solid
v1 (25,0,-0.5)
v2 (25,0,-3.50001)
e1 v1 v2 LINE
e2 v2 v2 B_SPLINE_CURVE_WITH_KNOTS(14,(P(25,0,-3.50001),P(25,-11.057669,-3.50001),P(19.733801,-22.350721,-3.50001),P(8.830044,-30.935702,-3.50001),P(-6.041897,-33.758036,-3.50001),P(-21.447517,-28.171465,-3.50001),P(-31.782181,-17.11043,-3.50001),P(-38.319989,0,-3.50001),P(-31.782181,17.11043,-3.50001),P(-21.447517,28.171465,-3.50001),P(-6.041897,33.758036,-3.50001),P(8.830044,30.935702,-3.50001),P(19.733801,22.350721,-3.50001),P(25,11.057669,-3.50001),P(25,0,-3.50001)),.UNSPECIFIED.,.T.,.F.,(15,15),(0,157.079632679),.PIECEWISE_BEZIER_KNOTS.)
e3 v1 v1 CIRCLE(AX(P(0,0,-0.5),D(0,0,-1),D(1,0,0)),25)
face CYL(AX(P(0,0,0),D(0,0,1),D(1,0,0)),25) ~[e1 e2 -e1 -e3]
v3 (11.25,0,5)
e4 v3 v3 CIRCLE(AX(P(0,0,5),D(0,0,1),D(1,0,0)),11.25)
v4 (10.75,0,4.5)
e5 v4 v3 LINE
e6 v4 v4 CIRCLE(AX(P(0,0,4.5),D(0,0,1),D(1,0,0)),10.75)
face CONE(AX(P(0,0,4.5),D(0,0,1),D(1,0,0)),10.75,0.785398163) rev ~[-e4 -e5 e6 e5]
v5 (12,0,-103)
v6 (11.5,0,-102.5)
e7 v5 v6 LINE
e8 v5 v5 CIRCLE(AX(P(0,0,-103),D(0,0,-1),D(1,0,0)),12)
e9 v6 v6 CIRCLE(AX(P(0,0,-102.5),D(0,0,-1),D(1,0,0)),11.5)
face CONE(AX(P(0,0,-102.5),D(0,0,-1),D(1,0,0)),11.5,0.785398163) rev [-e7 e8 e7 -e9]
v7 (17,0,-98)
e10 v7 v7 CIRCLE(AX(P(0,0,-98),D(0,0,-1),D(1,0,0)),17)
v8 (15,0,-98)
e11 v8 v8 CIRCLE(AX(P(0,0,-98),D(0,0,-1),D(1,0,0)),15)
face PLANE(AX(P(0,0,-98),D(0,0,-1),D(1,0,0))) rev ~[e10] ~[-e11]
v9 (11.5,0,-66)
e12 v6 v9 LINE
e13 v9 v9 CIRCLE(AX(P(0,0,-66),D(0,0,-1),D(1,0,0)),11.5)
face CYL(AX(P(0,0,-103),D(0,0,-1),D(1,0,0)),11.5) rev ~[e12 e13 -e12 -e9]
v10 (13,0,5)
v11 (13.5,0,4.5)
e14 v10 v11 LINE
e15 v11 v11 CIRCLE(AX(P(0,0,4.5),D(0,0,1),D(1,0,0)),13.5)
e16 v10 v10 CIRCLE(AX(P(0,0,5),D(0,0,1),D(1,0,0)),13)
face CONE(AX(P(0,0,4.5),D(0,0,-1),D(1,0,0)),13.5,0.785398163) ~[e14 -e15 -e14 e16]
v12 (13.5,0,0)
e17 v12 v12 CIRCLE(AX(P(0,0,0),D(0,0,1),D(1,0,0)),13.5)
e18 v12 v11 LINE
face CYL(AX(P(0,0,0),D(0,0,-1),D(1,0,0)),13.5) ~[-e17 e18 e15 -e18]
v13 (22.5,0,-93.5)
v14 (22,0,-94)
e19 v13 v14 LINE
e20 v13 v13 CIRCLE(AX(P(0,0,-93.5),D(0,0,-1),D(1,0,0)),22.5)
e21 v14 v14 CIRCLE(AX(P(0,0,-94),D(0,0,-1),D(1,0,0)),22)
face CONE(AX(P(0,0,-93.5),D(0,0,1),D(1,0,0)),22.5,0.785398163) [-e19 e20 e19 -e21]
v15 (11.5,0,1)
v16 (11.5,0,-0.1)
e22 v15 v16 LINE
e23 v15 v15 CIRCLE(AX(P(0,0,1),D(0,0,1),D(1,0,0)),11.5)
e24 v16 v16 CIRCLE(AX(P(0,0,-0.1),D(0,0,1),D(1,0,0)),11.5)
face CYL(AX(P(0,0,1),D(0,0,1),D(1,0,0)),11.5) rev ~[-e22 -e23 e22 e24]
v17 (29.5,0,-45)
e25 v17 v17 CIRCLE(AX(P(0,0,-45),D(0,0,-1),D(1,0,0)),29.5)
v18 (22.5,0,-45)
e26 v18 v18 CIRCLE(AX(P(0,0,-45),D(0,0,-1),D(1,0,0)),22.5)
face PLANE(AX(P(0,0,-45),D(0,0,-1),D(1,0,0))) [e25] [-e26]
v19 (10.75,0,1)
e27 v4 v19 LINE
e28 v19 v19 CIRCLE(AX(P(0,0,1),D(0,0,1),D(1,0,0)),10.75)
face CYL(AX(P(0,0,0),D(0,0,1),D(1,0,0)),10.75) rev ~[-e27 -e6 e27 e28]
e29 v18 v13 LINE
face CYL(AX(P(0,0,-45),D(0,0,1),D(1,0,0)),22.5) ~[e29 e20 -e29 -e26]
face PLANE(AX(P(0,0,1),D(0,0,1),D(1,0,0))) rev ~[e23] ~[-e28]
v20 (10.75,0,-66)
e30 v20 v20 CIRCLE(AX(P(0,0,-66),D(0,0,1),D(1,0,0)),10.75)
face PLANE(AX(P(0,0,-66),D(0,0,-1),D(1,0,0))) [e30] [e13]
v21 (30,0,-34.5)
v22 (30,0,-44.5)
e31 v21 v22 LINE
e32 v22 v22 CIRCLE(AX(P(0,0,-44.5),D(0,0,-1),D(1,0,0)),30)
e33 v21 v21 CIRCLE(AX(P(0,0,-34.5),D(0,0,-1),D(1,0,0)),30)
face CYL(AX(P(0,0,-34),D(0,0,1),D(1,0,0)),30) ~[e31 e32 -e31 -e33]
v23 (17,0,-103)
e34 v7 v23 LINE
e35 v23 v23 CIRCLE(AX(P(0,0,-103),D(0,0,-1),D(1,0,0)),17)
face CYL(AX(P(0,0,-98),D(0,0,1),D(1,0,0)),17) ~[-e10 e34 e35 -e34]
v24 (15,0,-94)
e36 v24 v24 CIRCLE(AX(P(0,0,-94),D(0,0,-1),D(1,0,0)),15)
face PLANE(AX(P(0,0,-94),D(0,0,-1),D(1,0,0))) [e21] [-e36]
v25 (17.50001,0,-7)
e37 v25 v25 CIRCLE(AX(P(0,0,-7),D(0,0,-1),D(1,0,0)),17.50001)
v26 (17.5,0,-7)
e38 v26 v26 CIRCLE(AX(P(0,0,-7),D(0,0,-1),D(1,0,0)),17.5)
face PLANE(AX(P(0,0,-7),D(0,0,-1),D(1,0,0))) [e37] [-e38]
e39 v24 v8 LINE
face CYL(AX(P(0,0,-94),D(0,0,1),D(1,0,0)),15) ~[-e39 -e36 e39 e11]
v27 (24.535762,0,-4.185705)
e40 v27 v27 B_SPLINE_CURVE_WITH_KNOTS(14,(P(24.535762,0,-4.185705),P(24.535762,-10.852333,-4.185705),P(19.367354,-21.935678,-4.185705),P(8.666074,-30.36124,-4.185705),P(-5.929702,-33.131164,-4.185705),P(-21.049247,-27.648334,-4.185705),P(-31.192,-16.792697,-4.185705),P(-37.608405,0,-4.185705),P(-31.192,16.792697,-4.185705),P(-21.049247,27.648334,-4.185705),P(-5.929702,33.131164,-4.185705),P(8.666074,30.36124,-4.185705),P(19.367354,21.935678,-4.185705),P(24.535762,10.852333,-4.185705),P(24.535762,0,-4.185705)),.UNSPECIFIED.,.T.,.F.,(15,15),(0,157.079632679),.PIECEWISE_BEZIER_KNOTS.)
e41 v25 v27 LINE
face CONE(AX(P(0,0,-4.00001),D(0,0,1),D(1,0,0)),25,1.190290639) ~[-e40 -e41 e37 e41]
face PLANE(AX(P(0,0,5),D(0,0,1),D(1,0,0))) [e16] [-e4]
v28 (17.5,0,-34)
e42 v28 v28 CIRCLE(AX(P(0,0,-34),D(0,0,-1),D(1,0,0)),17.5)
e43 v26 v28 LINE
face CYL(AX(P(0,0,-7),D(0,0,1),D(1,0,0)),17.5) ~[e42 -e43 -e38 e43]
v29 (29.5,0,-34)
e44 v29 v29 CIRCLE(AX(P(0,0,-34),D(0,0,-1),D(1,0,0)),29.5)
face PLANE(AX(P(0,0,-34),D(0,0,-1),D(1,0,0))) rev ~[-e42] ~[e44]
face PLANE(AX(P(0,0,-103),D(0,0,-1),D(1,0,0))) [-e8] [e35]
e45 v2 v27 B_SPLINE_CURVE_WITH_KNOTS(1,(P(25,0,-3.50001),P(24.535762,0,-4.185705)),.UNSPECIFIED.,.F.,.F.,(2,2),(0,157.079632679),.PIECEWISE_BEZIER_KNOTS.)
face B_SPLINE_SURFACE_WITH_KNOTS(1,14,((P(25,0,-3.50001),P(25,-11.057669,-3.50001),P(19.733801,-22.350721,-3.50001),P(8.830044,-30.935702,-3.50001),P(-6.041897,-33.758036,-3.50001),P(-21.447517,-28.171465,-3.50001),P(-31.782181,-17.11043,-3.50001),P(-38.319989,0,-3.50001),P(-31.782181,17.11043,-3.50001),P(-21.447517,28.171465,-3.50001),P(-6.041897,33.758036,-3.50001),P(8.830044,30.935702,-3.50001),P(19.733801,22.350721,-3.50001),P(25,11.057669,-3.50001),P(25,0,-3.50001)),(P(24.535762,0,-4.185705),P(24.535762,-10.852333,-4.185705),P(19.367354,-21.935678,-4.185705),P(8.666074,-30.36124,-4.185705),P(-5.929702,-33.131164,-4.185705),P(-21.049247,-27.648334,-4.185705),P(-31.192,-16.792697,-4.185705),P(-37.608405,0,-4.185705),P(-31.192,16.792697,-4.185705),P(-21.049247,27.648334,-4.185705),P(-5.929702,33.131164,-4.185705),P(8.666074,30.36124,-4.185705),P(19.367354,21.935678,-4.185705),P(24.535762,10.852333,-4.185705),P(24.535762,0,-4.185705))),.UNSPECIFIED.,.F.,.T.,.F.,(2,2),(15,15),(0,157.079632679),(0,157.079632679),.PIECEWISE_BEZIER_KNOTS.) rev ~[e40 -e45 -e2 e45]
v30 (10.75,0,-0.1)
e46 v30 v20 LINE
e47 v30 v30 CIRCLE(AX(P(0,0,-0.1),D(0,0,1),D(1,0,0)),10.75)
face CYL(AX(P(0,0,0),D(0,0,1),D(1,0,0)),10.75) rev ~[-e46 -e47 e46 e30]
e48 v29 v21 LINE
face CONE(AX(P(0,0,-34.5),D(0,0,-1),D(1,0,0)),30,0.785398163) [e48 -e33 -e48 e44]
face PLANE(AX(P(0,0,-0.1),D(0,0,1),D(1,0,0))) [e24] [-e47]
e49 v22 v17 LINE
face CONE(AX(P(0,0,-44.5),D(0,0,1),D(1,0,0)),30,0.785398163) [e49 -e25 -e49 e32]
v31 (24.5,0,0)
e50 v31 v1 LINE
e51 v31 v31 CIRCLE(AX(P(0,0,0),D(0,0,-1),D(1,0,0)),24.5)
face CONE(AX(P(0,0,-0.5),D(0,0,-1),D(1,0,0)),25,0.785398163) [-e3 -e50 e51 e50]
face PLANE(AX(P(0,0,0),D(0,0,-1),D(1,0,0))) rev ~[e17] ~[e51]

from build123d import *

# Parameters (mm, degrees)
F0_R      = 13.5
F0_R_2    = 10.75
F1_DEPTH  = 5
F2_R      = 25
F2_R_2    = 13.5
F2_R_3    = 10.75
F3_DEPTH  = 7
F4_R      = 17.5
F5_DEPTH  = 27
F6_R      = 30
F6_R_2    = 17.5
F7_DEPTH  = 11
F8_R      = 22.5
F9_DEPTH  = 49
F10_R     = 15
F11_DEPTH = 4
F12_R     = 17
F12_R_2   = 15
F13_DEPTH = 5
F14_R     = 11.5
F15_DEPTH = 37
F16_R     = 10.75
F17_DEPTH = 103.001
F18_SIZE  = 0.5
F19_SIZE2 = 2.99999
F19_SIZE  = 7.49999
F20_SIZE  = 0.5
F22_R     = 11.5
F23_DEPTH = 1.1


# Not quite as in the source:
# - a fillet or chamfer is up to 0.001 mm smaller than in the source, because OpenCascade refuses the exact size


with BuildPart() as f1:
    # F0 (on Top) → F1 (new body)
    with BuildSketch(Plane.XY):
        Circle(F0_R)
        Circle(F0_R_2, mode=Mode.SUBTRACT)
    extrude(amount=F1_DEPTH)

    # F2 (on face) → F3 (join)
    with BuildSketch(Plane(origin=(0, 0, 0), x_dir=(1, 0, 0), z_dir=(0, 0, -1))):
        Circle(F2_R)
        Circle(F2_R_2, mode=Mode.SUBTRACT)
        Circle(F2_R_2)
        Circle(F2_R_3, mode=Mode.SUBTRACT)
    extrude(amount=F3_DEPTH)

    # F4 (on face) → F5 (join)
    with BuildSketch(Plane(origin=(0, 0, -7), x_dir=(1, 0, 0), z_dir=(0, 0, -1))):
        Circle(F4_R)
    extrude(amount=F5_DEPTH)

    # F6 (on face) → F7 (join)
    with BuildSketch(Plane(origin=(0, 0, -34), x_dir=(1, 0, 0), z_dir=(0, 0, -1))):
        Circle(F6_R)
        Circle(F6_R_2, mode=Mode.SUBTRACT)
        Circle(F6_R_2)
    extrude(amount=F7_DEPTH)

    # F8 (on face) → F9 (join)
    with BuildSketch(Plane(origin=(0, 0, -45), x_dir=(1, 0, 0), z_dir=(0, 0, -1))):
        Circle(F8_R)
    extrude(amount=F9_DEPTH)

    # F10 (on face) → F11 (join)
    with BuildSketch(Plane(origin=(0, 0, -94), x_dir=(1, 0, 0), z_dir=(0, 0, -1))):
        Circle(F10_R)
    extrude(amount=F11_DEPTH)

    # F12 (on face) → F13 (join)
    with BuildSketch(Plane(origin=(0, 0, -98), x_dir=(1, 0, 0), z_dir=(0, 0, -1))):
        Circle(F12_R)
        Circle(F12_R_2, mode=Mode.SUBTRACT)
        Circle(F12_R_2)
    extrude(amount=F13_DEPTH)

    # F14 (on face) → F15 (cut)
    with BuildSketch(Plane(origin=(0, 0, -103), x_dir=(1, 0, 0), z_dir=(0, 0, -1))):
        Circle(F14_R)
    extrude(amount=-F15_DEPTH, mode=Mode.SUBTRACT)

    # F16 (on face) → F17 (cut, through all)
    with BuildSketch(Plane.XY):
        Circle(F16_R)
    extrude(amount=-F17_DEPTH, mode=Mode.SUBTRACT)

    # F18
    f18_edges = [f1.edges().sort_by_distance(p)[0] for p in [
        (-11.5, 0, -103),
        (-22.5, 0, -94),
        (-30, 0, -45),
        (-30, 0, -34),
        (-25, 0, 0),
        (-13.5, 0, 5),
        (-10.75, 0, 5),
    ]]
    chamfer(f18_edges, length=F18_SIZE)

    # F19 (size 7.5 and 3 in the source; OpenCascade refuses exactly that, so slightly less here)
    f19_edges = [f1.edges().sort_by_distance(p)[0] for p in [
        (-25, 0, -7),
    ]]
    f19_side = f1.faces().sort_by_distance((-24.292893, 0, -7))[0]
    chamfer(f19_edges, length=F19_SIZE, length2=F19_SIZE2, reference=f19_side)

    # F20
    f20_edges = [f1.edges().sort_by_distance(p)[0] for p in [
        (-25, 0, -4.00001),
    ]]
    chamfer(f20_edges, length=F20_SIZE)

    # F22 (on offset) → F23 (cut)
    with BuildSketch(Plane.XY.offset(1)):
        Circle(F22_R)
    extrude(amount=-F23_DEPTH, mode=Mode.SUBTRACT)


solid = f1.part
